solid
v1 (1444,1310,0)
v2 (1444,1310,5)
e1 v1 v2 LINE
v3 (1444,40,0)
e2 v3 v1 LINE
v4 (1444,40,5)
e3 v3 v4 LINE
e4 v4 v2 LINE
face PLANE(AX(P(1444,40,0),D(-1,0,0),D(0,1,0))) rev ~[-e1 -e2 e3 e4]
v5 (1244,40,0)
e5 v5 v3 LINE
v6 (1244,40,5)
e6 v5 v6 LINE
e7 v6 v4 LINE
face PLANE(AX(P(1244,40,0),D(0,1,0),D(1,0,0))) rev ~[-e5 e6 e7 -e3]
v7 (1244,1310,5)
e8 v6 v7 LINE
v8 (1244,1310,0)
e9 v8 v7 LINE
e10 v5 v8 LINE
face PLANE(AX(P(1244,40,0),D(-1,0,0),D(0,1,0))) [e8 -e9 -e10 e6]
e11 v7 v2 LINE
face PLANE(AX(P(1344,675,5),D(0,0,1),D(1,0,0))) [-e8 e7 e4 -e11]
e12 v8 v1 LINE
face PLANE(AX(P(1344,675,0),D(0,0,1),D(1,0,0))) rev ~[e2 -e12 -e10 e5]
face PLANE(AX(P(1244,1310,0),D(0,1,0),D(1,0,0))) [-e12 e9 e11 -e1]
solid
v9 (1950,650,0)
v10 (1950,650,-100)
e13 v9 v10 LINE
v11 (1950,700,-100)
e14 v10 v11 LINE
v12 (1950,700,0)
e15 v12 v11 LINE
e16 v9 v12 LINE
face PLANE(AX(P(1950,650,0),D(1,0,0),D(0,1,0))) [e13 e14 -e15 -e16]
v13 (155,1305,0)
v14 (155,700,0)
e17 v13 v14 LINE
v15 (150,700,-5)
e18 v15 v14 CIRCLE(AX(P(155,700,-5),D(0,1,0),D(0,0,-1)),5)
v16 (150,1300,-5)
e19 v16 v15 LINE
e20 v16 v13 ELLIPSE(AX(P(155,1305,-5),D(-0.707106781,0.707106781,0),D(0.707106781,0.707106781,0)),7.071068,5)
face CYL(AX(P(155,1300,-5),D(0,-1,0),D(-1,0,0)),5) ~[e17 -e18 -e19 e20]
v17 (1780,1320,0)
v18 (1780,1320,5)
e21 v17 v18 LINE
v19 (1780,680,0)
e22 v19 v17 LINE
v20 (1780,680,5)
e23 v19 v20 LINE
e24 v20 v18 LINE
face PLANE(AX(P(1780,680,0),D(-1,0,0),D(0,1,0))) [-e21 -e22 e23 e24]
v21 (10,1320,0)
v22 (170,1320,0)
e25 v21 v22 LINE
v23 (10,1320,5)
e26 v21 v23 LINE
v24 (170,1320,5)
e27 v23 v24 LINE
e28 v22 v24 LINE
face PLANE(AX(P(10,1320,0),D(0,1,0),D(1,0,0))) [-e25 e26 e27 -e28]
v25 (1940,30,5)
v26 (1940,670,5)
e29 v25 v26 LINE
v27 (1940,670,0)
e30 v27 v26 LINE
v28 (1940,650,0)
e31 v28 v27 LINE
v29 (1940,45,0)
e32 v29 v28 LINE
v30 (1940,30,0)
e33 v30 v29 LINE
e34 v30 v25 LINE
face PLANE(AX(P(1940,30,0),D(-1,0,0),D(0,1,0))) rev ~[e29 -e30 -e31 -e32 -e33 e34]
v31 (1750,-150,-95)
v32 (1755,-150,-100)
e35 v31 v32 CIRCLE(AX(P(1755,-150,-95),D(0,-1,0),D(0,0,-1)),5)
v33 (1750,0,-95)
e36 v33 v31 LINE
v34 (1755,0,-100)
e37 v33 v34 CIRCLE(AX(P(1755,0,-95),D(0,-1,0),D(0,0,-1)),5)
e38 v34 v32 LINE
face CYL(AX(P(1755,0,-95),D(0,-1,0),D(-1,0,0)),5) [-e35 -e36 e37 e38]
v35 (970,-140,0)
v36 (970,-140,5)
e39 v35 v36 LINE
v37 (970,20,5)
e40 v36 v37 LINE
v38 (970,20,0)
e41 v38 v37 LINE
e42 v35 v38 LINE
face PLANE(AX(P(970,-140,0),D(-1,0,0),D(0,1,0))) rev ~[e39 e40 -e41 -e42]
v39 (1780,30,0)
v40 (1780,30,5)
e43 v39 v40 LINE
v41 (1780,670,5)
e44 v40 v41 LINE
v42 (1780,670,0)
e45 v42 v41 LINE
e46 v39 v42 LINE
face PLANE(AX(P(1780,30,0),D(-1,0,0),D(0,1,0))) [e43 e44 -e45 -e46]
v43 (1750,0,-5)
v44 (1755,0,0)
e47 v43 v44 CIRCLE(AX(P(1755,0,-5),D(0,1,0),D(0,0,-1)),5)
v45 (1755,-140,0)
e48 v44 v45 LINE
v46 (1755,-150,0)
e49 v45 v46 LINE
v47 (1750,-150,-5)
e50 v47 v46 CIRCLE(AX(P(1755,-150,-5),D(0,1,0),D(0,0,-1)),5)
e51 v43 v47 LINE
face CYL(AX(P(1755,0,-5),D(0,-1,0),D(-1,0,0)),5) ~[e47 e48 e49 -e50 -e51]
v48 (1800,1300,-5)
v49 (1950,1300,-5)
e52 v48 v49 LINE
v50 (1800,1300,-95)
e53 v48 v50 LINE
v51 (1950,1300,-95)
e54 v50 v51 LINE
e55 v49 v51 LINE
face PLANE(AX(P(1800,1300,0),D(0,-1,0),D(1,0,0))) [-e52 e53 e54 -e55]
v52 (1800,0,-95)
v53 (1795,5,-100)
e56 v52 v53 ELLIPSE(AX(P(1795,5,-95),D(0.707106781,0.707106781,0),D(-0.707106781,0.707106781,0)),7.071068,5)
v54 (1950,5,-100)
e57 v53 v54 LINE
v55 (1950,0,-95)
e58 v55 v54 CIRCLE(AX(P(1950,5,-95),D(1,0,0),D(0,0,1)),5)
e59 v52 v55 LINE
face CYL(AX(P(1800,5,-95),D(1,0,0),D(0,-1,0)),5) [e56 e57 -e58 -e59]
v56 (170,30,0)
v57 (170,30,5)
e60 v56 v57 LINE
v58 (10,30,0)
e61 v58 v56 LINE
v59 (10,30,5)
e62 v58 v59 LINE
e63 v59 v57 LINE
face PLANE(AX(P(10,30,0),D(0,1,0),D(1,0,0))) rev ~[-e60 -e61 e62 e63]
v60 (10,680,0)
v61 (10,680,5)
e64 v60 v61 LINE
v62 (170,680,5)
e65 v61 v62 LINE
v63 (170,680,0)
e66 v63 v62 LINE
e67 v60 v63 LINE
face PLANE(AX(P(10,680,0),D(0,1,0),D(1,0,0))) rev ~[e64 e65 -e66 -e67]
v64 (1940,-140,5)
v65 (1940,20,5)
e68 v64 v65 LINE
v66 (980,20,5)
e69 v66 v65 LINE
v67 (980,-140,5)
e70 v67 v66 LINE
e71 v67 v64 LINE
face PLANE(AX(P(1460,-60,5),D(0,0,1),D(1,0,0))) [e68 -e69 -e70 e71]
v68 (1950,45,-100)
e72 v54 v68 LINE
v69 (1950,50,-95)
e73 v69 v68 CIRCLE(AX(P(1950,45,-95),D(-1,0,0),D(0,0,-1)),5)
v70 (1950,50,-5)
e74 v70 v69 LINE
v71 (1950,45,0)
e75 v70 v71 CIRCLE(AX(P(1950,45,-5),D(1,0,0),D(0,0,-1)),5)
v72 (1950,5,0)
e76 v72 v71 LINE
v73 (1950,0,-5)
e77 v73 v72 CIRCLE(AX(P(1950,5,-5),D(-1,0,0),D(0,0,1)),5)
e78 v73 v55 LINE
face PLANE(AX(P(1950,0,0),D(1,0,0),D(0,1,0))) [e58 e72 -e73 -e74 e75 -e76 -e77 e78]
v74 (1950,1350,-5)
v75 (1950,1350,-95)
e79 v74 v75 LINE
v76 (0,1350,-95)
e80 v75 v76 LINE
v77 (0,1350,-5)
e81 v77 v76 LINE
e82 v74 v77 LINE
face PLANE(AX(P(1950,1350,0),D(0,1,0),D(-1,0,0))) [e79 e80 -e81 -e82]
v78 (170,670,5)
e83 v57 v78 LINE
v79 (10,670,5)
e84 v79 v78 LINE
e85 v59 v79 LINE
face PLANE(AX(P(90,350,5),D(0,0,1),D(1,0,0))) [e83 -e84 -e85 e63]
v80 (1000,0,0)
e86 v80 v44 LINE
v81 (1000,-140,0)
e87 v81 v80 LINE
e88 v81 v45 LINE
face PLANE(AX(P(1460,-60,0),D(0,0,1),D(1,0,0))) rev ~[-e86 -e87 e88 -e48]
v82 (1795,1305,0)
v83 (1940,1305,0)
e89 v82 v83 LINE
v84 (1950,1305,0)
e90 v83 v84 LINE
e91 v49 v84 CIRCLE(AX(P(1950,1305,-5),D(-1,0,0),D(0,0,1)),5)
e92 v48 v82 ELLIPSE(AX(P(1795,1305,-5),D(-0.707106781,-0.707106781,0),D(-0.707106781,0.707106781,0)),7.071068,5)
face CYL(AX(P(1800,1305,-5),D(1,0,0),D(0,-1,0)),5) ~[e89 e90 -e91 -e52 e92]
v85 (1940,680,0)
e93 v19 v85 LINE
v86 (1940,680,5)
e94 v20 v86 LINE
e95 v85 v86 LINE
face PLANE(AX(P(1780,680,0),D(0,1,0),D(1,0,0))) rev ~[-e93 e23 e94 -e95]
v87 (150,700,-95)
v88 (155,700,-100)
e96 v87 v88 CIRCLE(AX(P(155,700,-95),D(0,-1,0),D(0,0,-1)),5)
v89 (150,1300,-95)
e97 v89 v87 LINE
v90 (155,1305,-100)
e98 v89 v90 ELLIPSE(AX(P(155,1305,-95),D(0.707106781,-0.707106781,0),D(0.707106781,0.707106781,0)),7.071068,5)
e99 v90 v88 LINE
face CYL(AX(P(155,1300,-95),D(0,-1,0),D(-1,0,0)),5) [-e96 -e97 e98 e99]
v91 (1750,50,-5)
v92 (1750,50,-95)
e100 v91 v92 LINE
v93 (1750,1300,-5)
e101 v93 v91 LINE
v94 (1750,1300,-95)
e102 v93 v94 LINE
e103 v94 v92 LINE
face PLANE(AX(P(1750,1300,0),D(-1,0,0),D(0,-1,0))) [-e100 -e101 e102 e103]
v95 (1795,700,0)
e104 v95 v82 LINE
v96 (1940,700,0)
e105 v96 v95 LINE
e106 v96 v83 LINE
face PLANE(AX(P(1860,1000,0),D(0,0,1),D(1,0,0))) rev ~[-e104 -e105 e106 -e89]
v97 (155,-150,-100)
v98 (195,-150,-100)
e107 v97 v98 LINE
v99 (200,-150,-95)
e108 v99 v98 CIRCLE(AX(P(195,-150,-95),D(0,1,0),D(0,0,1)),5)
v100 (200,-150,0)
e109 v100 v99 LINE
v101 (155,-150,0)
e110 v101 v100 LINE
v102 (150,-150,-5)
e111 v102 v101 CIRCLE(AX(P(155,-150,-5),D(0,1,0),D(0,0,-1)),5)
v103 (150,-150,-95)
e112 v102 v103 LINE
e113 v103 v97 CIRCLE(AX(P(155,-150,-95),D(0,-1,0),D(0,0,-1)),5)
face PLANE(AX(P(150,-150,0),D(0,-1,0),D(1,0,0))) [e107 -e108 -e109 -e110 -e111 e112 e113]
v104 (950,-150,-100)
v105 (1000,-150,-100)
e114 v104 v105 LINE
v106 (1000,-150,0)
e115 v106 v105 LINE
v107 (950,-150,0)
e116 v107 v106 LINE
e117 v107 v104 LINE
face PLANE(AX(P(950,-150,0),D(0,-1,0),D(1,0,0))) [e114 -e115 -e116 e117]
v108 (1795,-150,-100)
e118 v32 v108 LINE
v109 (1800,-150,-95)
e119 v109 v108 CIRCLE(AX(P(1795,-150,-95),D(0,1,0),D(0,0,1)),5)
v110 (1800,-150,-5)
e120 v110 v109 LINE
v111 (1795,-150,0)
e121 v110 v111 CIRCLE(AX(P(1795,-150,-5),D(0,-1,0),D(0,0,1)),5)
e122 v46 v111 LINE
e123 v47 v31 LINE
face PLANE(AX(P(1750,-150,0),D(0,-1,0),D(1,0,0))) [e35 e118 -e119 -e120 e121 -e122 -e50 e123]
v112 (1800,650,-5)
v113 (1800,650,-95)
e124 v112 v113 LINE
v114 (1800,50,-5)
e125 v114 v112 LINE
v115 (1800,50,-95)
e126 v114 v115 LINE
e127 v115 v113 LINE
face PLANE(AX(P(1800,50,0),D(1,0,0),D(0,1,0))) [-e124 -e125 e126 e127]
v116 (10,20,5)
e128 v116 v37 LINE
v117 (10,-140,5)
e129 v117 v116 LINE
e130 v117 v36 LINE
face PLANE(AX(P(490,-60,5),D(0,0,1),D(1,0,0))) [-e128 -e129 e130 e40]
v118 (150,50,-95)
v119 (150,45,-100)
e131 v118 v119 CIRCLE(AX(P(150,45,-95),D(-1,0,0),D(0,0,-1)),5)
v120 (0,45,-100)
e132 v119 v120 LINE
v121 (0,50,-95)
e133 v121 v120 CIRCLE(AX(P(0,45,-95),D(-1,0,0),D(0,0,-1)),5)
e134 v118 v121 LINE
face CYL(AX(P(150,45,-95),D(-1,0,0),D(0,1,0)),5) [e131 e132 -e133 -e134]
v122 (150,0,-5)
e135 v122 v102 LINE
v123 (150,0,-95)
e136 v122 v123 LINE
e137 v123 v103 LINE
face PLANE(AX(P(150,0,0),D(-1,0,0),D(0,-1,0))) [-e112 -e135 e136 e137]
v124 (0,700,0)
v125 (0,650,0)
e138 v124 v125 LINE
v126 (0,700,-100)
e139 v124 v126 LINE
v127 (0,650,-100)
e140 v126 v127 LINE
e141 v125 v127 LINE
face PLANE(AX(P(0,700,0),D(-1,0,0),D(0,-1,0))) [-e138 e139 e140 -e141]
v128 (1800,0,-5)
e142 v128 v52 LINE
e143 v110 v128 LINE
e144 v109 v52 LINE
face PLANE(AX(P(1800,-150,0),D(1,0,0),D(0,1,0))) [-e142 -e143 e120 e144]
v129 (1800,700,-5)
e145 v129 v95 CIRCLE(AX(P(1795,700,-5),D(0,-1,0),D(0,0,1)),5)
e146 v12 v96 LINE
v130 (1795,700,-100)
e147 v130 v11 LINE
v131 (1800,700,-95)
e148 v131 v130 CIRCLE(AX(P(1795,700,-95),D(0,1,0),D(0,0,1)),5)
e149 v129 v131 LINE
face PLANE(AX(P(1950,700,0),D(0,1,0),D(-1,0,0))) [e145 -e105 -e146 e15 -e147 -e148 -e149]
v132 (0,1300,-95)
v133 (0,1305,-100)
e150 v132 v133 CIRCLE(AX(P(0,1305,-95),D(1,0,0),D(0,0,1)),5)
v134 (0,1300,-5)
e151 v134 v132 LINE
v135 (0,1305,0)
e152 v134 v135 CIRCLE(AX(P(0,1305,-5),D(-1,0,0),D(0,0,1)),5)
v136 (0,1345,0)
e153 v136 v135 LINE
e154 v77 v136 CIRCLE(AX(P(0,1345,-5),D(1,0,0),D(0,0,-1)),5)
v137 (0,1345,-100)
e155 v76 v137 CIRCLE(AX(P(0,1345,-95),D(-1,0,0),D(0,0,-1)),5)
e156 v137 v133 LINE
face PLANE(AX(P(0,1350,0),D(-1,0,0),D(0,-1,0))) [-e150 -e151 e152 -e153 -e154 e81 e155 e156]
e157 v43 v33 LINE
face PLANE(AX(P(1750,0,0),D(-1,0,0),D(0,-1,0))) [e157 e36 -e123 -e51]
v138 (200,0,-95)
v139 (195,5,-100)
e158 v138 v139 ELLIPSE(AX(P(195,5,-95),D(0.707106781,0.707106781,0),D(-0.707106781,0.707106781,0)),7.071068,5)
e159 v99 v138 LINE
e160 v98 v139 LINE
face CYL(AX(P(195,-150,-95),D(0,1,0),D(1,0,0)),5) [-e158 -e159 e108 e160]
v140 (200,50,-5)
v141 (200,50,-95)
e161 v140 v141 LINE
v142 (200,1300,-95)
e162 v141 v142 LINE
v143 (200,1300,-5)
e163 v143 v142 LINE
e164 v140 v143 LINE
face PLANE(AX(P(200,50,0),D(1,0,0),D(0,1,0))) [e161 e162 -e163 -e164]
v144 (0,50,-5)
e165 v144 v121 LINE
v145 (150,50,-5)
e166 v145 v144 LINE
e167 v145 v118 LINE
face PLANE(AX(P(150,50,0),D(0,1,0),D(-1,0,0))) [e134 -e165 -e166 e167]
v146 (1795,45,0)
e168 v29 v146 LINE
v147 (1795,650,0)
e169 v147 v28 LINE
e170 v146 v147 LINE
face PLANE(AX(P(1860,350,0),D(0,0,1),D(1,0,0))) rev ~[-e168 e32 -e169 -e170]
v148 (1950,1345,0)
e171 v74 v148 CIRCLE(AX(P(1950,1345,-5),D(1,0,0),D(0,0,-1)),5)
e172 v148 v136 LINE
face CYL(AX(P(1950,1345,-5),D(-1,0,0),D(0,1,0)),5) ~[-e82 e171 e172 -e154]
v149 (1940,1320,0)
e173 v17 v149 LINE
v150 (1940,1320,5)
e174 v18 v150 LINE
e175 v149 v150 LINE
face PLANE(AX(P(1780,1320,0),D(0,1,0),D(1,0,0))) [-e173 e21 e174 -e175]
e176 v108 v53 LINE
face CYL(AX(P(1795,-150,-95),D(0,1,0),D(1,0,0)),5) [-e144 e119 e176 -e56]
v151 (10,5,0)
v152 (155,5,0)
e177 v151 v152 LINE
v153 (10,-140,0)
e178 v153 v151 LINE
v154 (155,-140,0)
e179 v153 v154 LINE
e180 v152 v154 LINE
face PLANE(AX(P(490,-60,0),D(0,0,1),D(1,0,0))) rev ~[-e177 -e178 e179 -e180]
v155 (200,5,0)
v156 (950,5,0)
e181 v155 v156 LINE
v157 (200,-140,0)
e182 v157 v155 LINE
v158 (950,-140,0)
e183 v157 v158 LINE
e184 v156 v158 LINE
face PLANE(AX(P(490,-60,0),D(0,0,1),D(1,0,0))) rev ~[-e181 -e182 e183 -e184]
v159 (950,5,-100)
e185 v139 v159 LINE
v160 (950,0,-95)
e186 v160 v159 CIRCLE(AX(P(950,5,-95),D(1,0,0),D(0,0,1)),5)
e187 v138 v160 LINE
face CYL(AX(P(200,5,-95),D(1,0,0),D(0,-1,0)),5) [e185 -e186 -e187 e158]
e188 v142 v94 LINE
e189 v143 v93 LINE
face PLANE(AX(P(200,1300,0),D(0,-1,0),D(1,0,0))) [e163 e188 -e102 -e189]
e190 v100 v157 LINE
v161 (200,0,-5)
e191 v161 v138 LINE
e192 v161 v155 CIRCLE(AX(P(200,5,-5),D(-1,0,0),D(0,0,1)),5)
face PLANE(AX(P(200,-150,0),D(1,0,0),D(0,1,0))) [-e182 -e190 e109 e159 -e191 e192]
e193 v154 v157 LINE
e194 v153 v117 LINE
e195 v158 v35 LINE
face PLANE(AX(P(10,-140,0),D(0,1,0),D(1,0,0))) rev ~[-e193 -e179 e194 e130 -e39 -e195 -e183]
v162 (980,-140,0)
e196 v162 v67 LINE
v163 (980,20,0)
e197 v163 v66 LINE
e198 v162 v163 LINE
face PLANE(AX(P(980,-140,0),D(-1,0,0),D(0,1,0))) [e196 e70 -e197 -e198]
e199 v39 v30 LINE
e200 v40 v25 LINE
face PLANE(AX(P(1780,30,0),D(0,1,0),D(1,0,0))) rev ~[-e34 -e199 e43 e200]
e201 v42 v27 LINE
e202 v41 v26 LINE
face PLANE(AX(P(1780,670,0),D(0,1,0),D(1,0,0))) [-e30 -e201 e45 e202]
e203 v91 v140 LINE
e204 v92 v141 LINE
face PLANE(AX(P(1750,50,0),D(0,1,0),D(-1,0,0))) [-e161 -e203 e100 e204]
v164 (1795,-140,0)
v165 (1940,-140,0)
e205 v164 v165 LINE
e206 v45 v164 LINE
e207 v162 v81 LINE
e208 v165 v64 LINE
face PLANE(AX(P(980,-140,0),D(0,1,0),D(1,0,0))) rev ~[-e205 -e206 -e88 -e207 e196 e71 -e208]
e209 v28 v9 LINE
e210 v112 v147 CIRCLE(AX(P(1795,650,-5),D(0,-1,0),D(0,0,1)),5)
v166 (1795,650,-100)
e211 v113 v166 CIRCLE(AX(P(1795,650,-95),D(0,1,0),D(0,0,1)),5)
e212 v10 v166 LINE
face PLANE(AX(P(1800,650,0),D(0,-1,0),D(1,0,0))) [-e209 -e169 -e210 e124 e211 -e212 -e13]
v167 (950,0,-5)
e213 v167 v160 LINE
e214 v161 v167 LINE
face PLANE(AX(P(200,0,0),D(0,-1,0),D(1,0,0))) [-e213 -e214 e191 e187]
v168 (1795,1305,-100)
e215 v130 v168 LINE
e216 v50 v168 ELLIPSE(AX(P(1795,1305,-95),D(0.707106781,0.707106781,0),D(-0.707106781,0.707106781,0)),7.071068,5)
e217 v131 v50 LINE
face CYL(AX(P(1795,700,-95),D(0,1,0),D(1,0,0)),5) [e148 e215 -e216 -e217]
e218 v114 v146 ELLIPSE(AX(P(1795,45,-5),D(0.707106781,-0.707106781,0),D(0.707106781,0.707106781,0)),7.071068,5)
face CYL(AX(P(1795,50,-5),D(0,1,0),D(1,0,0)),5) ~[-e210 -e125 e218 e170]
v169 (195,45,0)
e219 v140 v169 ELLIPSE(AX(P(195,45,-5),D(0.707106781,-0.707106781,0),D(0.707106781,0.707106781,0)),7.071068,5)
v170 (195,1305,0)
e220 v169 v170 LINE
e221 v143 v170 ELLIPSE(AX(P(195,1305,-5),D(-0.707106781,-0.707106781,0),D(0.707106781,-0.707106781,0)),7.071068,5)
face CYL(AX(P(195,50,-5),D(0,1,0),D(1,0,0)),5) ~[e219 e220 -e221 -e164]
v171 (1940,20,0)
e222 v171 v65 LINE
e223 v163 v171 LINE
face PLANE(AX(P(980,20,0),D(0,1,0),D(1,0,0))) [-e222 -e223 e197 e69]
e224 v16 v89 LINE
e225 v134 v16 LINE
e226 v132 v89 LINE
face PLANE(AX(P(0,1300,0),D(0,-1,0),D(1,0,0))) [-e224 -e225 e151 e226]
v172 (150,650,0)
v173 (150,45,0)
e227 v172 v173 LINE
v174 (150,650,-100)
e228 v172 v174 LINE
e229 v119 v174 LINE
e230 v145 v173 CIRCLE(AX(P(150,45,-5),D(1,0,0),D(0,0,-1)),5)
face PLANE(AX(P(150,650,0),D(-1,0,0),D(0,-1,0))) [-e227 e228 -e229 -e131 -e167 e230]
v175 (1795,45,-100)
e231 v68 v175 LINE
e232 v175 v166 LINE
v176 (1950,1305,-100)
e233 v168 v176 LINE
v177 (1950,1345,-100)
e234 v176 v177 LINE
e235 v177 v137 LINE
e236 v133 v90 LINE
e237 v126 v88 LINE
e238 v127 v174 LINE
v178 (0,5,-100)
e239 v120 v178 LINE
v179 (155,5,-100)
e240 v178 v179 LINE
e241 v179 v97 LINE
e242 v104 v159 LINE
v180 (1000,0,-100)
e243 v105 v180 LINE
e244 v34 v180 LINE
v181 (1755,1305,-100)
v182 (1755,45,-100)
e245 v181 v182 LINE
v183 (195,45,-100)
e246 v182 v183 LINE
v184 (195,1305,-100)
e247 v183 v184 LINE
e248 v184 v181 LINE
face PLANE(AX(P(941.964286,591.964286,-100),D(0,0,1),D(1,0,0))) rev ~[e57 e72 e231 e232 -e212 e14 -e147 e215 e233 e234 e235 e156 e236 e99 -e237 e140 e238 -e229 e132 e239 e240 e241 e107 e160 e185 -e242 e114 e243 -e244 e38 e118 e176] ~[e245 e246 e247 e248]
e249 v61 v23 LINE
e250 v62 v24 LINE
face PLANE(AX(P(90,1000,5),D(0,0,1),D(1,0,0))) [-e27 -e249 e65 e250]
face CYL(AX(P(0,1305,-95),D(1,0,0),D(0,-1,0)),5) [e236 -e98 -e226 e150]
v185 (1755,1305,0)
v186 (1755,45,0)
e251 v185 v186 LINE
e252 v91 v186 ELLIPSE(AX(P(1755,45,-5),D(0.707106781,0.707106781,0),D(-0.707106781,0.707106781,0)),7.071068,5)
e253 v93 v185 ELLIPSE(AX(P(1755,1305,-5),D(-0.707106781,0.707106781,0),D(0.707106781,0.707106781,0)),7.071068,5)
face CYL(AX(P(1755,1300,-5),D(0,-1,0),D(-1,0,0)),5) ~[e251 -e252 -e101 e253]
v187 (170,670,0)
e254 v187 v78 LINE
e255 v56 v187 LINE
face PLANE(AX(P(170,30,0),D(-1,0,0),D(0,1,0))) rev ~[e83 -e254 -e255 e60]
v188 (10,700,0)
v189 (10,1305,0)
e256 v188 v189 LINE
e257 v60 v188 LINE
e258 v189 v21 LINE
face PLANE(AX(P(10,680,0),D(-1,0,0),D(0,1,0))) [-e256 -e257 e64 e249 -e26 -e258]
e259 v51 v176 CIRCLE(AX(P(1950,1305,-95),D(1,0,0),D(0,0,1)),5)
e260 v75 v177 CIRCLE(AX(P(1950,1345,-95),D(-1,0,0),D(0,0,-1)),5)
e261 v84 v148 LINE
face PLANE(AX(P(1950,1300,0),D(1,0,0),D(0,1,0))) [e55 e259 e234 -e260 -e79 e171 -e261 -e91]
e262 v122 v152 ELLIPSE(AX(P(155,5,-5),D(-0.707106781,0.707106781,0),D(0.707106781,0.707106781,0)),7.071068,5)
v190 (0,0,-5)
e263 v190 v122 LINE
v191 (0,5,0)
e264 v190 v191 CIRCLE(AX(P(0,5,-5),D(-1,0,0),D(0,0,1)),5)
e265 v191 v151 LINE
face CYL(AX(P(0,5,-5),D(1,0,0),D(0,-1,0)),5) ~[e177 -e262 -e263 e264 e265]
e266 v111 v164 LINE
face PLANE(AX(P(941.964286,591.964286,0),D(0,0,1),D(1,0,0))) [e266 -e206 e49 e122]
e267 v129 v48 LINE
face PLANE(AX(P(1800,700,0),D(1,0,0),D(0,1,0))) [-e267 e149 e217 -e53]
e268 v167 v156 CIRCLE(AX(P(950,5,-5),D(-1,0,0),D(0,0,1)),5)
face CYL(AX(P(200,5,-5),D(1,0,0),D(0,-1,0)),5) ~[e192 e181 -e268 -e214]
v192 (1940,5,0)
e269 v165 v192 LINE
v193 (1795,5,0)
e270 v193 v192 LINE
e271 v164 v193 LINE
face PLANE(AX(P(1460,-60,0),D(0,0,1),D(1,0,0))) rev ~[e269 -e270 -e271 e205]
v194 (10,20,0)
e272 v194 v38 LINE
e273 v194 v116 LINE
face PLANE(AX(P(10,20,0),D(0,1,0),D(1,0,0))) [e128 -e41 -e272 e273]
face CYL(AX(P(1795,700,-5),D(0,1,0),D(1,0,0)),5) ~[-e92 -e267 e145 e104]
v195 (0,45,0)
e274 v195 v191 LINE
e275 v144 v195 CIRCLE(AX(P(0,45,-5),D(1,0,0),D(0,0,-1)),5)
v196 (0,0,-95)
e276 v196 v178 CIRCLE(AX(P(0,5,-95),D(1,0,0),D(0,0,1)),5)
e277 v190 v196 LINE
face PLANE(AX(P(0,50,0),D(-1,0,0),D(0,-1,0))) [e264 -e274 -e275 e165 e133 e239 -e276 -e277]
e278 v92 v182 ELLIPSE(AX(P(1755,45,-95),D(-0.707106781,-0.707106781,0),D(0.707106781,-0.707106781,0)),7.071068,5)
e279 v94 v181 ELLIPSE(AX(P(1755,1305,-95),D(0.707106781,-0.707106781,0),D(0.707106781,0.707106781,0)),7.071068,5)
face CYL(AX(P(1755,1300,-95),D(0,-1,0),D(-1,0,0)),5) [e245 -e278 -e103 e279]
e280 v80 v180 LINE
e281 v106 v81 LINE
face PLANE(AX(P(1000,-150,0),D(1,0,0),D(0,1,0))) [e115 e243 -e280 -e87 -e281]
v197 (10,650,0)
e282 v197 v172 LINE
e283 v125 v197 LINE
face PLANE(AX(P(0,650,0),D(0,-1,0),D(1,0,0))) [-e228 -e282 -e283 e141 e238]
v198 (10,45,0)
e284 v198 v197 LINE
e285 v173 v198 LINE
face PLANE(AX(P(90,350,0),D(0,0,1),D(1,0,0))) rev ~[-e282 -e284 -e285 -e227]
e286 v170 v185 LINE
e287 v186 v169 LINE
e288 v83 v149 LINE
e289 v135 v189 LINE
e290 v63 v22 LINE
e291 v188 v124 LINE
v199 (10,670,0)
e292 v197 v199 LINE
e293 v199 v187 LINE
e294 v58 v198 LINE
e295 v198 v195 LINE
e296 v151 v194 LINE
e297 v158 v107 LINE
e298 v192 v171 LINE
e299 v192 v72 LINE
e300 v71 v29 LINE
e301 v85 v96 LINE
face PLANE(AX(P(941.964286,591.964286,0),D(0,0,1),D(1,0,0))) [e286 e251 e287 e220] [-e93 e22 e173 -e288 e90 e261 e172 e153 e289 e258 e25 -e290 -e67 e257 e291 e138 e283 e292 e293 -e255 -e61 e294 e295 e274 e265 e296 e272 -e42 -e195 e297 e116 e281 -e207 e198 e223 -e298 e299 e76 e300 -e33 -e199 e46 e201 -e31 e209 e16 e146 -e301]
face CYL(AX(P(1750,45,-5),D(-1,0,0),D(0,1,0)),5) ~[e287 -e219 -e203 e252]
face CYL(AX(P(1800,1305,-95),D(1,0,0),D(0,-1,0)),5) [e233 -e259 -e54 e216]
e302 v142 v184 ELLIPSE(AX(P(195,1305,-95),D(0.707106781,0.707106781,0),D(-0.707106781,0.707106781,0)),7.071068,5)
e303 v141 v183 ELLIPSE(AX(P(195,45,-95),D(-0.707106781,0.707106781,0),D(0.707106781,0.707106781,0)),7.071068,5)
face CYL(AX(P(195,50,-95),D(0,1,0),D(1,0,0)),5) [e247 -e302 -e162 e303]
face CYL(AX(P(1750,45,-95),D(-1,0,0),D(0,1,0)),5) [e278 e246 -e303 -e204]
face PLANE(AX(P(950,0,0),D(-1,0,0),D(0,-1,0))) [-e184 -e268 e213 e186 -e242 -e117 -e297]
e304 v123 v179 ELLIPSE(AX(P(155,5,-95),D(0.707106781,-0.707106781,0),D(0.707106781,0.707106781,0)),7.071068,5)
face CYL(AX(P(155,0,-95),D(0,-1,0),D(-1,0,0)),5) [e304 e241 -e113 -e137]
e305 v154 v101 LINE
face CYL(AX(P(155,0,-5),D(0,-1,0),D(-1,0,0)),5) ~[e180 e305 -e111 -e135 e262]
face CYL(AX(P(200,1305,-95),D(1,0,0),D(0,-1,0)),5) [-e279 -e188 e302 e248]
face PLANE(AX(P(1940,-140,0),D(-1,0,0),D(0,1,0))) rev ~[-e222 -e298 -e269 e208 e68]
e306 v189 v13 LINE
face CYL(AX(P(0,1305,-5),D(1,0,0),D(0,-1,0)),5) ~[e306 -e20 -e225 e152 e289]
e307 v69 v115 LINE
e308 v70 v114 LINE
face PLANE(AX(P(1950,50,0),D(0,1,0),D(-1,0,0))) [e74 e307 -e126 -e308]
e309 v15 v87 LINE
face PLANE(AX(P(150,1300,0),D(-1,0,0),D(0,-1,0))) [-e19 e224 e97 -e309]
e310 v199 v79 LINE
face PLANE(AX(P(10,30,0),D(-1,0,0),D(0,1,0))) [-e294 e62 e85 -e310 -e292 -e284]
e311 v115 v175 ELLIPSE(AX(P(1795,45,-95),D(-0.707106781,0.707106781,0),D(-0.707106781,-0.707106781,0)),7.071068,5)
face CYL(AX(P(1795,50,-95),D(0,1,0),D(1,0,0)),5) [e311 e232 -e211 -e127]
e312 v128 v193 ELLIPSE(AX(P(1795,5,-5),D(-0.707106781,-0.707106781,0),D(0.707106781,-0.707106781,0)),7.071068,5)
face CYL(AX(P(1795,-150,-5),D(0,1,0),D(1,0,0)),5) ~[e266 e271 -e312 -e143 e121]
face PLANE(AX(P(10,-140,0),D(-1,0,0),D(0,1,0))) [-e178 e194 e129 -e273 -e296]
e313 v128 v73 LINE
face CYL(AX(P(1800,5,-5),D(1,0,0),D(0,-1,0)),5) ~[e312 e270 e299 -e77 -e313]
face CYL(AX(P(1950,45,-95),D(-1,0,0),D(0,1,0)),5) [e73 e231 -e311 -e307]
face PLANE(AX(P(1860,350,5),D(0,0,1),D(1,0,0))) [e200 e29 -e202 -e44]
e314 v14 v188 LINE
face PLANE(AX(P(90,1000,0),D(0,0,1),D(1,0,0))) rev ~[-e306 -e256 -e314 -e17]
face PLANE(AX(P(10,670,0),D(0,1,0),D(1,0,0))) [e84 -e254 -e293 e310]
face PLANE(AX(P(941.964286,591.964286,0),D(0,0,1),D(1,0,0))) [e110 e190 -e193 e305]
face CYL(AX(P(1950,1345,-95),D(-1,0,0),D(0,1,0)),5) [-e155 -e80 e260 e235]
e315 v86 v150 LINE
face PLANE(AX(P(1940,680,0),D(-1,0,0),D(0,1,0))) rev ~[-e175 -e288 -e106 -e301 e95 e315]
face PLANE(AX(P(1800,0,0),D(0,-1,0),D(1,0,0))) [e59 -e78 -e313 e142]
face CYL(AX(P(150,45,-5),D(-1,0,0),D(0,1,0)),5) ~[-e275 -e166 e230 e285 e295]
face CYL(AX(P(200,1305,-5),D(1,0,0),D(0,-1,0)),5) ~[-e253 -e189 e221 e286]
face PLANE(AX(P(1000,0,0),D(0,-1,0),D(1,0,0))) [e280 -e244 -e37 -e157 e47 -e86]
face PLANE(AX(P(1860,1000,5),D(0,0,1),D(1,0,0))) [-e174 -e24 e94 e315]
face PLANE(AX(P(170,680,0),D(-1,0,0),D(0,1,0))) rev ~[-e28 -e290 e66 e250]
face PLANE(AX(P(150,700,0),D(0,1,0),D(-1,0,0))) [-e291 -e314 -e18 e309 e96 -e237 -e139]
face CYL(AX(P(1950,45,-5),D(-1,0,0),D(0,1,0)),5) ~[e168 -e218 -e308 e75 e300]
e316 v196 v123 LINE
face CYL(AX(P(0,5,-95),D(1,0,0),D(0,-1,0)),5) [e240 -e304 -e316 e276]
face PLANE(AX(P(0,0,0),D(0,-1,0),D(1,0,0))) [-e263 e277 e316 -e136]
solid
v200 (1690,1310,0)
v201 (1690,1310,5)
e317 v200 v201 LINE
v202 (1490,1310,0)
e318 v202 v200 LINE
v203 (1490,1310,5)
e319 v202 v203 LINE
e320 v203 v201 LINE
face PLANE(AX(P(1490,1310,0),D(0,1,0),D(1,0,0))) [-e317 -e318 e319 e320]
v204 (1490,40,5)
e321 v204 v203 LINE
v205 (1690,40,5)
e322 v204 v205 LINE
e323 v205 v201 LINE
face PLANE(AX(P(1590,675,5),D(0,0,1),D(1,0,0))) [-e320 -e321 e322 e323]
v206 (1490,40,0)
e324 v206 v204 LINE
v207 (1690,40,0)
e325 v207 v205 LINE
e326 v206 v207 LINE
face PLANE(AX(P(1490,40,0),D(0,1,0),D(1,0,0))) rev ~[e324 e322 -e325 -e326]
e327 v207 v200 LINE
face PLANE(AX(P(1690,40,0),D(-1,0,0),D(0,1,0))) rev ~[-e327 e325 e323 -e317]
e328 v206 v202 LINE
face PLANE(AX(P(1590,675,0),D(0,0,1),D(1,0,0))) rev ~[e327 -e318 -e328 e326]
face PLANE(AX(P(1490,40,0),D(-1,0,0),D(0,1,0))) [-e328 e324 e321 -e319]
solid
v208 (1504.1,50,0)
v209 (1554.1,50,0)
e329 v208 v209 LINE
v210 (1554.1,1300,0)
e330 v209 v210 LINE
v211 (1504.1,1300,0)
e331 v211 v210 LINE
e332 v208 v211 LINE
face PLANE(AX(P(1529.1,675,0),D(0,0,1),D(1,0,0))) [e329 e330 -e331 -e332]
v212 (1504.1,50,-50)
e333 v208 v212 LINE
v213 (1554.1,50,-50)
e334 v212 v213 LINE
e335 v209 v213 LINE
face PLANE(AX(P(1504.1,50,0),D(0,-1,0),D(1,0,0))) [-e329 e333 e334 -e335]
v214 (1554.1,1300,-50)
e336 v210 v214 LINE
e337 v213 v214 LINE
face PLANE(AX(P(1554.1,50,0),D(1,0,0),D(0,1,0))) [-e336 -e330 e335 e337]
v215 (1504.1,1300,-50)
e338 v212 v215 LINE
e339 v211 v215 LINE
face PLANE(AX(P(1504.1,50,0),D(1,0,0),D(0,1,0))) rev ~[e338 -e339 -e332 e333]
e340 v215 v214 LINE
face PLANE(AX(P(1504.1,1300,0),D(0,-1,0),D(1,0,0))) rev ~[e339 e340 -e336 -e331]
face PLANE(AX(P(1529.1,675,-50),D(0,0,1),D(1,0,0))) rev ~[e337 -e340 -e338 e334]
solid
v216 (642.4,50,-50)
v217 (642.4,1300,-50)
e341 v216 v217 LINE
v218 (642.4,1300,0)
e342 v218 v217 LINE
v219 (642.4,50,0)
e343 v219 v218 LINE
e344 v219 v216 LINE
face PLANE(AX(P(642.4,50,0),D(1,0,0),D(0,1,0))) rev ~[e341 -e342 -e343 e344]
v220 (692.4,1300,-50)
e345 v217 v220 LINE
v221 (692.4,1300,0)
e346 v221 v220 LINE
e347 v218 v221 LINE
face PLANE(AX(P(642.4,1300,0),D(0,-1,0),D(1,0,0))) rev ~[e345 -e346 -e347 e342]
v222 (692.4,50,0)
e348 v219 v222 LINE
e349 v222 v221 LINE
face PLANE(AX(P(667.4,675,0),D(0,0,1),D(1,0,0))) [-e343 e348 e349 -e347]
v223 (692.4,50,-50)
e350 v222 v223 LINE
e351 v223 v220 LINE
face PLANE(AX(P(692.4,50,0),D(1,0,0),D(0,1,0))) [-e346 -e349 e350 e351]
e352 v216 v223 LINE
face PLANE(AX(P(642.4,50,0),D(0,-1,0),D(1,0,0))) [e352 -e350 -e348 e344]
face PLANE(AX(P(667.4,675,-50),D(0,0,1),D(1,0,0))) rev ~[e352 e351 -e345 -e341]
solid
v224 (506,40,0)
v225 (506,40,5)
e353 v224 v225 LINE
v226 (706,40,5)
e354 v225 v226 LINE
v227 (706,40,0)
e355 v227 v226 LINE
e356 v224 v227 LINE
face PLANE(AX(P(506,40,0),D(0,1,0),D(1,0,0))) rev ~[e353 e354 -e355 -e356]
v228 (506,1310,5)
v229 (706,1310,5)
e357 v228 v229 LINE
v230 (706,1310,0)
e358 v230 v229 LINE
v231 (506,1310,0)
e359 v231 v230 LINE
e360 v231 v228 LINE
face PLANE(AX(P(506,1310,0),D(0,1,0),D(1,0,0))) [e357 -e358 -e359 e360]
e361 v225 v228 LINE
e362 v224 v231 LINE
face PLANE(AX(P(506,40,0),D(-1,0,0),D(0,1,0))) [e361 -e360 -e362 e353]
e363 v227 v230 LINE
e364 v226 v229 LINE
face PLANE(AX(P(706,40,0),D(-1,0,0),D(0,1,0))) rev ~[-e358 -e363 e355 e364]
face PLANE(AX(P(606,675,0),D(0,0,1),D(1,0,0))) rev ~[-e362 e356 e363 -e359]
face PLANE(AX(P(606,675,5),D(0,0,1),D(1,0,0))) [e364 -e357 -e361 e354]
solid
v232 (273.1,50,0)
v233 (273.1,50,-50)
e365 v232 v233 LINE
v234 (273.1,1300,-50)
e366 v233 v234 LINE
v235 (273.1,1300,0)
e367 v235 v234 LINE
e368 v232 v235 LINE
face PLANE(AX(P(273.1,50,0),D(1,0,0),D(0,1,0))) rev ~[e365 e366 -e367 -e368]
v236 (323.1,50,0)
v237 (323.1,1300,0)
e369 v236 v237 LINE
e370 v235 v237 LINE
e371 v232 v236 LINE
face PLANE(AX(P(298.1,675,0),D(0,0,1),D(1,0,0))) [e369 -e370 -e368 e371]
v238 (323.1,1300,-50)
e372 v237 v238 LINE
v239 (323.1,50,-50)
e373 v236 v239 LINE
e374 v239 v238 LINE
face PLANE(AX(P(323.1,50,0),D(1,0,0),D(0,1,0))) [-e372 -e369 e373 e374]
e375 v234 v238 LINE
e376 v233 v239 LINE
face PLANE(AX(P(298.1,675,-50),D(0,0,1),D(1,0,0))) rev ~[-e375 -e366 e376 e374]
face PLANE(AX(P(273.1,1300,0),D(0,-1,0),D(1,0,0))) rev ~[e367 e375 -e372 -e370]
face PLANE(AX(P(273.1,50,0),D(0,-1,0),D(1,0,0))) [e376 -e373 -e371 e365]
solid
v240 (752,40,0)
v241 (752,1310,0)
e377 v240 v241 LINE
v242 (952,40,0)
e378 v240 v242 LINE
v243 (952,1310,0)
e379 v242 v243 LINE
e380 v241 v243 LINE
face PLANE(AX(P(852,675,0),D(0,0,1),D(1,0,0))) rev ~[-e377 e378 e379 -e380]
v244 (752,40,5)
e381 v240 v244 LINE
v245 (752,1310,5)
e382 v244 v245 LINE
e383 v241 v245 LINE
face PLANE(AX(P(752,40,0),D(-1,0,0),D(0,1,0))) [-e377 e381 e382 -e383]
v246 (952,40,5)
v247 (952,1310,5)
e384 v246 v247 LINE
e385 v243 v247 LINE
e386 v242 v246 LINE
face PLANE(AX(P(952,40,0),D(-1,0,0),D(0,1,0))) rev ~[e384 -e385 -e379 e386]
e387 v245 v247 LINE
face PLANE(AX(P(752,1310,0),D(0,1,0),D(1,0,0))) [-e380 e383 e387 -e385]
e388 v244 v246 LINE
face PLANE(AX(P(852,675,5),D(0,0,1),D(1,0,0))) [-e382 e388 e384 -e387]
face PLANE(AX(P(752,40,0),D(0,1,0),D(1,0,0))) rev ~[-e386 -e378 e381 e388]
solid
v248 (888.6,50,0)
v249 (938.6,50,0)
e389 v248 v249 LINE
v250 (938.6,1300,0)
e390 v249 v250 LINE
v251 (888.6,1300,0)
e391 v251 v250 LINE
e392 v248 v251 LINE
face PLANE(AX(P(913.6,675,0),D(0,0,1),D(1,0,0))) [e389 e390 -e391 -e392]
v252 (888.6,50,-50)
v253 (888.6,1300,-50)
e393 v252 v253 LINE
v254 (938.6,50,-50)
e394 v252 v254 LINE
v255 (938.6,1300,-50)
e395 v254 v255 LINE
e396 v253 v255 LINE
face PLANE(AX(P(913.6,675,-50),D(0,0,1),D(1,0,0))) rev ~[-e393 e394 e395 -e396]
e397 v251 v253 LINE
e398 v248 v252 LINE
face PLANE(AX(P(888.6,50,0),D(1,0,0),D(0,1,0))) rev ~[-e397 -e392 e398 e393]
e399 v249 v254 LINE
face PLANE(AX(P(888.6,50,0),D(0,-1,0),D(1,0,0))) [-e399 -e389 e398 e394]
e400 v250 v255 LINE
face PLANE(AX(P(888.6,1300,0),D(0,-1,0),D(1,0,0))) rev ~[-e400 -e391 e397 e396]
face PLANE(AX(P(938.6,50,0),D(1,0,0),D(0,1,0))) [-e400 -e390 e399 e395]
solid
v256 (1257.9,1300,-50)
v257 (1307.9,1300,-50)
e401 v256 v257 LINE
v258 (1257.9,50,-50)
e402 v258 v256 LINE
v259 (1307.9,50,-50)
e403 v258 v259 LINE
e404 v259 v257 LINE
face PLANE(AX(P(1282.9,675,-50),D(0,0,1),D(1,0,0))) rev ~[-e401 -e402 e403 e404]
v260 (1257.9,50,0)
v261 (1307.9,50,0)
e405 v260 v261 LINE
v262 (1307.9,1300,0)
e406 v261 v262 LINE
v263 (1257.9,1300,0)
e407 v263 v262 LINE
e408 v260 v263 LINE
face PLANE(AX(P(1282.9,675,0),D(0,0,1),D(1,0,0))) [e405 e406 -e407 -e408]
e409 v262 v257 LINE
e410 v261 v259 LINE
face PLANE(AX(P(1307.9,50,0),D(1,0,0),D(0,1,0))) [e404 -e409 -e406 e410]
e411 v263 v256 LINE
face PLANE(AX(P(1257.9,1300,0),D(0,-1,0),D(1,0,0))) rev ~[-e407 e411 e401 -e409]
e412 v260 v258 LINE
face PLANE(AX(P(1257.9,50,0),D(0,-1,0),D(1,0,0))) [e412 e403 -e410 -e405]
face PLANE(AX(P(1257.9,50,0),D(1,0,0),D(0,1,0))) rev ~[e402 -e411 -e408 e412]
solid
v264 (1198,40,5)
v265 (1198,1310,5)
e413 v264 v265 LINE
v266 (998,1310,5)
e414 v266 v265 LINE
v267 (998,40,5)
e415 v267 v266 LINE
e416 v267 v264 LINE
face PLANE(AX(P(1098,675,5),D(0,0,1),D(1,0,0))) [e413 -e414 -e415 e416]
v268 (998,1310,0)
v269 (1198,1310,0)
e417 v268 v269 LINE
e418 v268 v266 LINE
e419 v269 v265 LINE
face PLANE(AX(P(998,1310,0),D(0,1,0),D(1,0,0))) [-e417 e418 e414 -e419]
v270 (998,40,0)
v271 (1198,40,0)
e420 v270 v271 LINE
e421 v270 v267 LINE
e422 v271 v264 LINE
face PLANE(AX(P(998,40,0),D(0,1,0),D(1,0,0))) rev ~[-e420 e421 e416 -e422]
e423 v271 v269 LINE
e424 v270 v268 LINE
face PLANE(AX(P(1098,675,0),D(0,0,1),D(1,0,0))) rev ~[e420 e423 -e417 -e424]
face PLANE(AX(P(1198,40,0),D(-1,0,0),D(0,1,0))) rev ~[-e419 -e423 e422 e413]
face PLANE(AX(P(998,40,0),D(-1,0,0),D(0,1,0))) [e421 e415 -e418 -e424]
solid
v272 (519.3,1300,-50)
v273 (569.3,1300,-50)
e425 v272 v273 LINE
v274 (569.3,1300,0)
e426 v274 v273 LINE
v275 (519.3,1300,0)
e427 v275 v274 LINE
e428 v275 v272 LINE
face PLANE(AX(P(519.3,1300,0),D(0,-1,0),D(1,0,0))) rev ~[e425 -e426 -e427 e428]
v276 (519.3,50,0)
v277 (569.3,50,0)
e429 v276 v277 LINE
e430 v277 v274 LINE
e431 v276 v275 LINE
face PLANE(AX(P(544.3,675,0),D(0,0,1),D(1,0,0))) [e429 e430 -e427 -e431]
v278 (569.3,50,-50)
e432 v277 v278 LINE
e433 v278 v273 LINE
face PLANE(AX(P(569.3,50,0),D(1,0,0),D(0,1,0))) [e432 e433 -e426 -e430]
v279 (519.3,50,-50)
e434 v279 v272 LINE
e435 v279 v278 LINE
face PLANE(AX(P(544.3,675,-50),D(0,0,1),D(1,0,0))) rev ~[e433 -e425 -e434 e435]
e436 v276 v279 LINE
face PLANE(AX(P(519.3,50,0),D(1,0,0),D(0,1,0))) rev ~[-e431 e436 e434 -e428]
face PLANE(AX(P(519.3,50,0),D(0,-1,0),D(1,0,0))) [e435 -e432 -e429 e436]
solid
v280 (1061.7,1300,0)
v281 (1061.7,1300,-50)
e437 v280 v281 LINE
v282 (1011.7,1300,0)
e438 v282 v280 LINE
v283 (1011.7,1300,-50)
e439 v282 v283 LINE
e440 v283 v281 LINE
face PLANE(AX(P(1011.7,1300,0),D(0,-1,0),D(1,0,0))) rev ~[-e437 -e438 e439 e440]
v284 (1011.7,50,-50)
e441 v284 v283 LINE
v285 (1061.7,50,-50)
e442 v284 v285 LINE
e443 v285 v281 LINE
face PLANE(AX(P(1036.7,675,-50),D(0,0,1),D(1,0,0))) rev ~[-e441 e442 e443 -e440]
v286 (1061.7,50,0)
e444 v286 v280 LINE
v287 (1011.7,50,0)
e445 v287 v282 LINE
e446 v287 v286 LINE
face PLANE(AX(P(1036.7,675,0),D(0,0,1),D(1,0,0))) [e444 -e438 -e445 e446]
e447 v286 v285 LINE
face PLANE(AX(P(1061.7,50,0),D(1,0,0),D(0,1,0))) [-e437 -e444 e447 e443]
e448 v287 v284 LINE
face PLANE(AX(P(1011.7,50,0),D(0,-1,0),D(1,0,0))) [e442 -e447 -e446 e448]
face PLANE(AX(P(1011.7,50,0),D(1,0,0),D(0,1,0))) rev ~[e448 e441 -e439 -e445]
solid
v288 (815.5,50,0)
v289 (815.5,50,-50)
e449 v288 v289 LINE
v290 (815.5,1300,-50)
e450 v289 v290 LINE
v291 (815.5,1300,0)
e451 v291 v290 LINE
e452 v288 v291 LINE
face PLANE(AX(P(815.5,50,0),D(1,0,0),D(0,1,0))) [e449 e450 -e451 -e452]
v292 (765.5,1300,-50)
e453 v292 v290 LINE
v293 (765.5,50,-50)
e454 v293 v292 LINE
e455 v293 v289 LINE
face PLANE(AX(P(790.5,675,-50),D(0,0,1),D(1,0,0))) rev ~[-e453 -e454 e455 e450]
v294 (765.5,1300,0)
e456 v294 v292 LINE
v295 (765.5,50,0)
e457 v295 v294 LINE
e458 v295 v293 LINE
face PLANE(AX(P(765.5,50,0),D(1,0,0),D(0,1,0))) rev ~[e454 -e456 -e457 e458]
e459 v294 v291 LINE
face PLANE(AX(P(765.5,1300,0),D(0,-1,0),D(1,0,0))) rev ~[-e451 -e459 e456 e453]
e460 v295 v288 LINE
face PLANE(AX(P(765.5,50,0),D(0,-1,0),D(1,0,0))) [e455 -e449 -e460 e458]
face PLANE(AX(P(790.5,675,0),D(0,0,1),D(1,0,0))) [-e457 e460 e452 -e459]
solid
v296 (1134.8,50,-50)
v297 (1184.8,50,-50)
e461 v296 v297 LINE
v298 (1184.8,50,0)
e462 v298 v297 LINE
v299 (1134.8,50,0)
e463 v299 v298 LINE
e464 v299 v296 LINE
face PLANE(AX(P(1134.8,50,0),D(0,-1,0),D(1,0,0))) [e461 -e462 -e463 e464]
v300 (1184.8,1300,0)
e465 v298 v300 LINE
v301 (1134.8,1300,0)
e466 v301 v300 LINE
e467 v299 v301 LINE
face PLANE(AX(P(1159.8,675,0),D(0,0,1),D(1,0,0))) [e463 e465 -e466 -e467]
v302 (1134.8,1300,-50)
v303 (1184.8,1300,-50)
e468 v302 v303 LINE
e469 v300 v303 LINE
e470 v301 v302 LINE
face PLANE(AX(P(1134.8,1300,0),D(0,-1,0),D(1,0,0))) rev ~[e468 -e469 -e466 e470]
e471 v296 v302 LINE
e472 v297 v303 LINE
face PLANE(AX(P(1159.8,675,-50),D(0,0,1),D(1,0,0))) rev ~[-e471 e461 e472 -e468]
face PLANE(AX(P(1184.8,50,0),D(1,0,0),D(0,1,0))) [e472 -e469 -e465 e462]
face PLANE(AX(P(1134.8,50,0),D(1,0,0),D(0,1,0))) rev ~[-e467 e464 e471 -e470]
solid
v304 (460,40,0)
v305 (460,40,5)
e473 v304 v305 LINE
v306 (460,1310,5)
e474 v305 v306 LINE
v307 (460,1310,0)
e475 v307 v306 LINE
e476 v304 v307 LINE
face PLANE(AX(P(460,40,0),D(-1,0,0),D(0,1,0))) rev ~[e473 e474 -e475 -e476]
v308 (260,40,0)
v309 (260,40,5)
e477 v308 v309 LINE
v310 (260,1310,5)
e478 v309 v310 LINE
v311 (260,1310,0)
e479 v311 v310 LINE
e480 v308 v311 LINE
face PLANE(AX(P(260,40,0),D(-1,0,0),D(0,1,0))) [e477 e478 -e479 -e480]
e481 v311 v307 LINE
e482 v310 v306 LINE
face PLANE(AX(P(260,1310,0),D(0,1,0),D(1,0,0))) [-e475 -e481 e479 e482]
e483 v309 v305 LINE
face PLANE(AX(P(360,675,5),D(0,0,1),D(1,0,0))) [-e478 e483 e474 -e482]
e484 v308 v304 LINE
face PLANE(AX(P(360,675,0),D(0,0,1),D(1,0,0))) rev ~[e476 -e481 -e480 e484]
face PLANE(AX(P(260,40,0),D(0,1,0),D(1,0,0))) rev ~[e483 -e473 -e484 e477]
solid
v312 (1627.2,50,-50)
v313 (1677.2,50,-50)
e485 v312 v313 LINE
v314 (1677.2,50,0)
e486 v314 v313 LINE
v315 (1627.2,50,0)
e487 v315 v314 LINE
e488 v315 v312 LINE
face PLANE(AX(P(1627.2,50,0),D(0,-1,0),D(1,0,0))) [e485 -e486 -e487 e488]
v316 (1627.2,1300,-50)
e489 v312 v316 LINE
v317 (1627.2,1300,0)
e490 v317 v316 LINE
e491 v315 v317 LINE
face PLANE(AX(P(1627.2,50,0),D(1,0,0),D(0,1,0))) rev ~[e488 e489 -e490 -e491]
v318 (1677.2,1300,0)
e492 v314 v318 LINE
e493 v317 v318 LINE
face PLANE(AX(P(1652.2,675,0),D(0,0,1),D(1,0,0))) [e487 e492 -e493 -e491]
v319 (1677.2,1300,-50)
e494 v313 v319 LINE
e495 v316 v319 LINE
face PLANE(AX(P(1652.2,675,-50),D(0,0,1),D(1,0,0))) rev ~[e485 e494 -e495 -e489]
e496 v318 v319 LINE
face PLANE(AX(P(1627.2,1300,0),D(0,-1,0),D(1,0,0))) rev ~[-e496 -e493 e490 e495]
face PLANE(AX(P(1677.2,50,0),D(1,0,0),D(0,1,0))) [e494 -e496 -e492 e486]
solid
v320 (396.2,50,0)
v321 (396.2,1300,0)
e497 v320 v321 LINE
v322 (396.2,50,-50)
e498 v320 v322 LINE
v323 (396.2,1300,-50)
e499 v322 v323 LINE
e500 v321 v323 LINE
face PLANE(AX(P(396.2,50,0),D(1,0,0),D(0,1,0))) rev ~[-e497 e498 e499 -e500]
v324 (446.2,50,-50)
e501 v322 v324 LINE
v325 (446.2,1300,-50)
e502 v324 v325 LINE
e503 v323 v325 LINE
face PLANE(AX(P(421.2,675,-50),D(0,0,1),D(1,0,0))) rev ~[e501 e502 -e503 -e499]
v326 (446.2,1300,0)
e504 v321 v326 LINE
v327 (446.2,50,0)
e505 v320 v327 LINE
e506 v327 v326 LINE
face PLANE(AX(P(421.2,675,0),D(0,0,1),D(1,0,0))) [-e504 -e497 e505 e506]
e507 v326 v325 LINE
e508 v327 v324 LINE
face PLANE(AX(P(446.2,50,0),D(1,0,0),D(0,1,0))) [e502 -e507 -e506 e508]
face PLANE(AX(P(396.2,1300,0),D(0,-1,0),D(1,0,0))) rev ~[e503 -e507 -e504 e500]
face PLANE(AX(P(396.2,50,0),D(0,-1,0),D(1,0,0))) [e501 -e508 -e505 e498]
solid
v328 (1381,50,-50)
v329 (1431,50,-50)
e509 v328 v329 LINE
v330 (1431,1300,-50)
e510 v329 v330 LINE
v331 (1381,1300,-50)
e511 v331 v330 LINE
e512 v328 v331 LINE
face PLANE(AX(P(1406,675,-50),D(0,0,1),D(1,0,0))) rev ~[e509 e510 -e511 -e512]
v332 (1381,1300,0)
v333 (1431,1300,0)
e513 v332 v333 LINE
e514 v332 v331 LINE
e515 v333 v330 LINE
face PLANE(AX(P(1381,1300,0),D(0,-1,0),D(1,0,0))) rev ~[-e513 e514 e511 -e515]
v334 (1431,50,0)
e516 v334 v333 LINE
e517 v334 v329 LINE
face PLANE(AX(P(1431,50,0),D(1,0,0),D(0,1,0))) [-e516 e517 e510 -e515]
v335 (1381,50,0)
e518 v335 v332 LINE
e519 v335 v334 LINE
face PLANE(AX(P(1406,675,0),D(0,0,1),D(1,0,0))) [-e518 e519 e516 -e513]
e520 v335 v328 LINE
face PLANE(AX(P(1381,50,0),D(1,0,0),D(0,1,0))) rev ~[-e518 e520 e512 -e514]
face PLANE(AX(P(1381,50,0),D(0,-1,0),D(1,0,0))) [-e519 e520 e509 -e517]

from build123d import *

# Parameters (mm, degrees)
F1_DEPTH = 100
F2_R     = 5
F0_W     = 50
F0_H     = 1250
F3_DEPTH = 50
F5_W     = 960
F5_H     = 160
F5_W_2   = 160
F5_H_2   = 640
F6_DEPTH = 5
F7_W     = 200
F7_H     = 1270
F8_DEPTH = 5


# Not quite as in the source:
# - two fillets or chamfers of one size are made in one step


with BuildPart() as f1:
    # F0 (on Top) → F1 (new body)
    with BuildSketch(Plane.XY):
        Polygon((0, 50), (0, 0), (150, 0), (150, -150), (200, -150), (200, 0), (950, 0), (950, -150), (1000, -150), (1000, 0), (1750, 0), (1750, -150), (1800, -150), (1800, 0), (1950, 0), (1950, 50), (1800, 50), (1800, 650), (1800, 700), (1800, 1300), (1950, 1300), (1950, 1350), (0, 1350), (0, 1300), (150, 1300), (150, 700), (0, 700), (0, 675), (0, 650), (150, 650), (150, 50), align=None)
        Polygon((200, 50), (200, 1300), (273.1, 1300), (323.1, 1300), (396.2, 1300), (446.2, 1300), (519.3, 1300), (569.3, 1300), (642.4, 1300), (692.4, 1300), (765.5, 1300), (815.5, 1300), (888.6, 1300), (938.6, 1300), (1011.7, 1300), (1061.7, 1300), (1134.8, 1300), (1184.8, 1300), (1257.9, 1300), (1307.9, 1300), (1381, 1300), (1431, 1300), (1504.1, 1300), (1554.1, 1300), (1627.2, 1300), (1677.2, 1300), (1750, 1300), (1750, 50), (1677.2, 50), (1627.2, 50), (1554.1, 50), (1504.1, 50), (1431, 50), (1381, 50), (1307.9, 50), (1257.9, 50), (1184.8, 50), (1134.8, 50), (1061.7, 50), (1011.7, 50), (938.6, 50), (888.6, 50), (815.5, 50), (765.5, 50), (692.4, 50), (642.4, 50), (569.3, 50), (519.3, 50), (446.2, 50), (396.2, 50), (323.1, 50), (273.1, 50), align=None, mode=Mode.SUBTRACT)
        Polygon((1950, 700), (1800, 700), (1800, 650), (1950, 650), (1950, 675), align=None)
    extrude(amount=-F1_DEPTH)

    # F2
    f2_edges = [f1.edges().sort_by_distance(p)[0] for p in [
        (75, 1300, 0),
        (975, 1350, 0),
        (975, 1300, 0),
        (200, 675, 0),
        (150, 1000, 0),
        (575, 0, 0),
        (975, 50, 0),
        (75, 50, 0),
        (75, 0, 0),
        (150, -75, 0),
        (1750, 675, 0),
        (1800, 350, 0),
        (1800, 1000, 0),
        (1875, 50, 0),
        (1875, 0, 0),
        (1800, -75, 0),
        (1750, -75, 0),
        (1875, 1300, 0),
        (75, 0, -100),
        (150, -75, -100),
        (200, -75, -100),
        (575, 0, -100),
        (1750, -75, -100),
        (1800, -75, -100),
        (1875, 0, -100),
        (1875, 50, -100),
        (1800, 350, -100),
        (1800, 1000, -100),
        (1875, 1300, -100),
        (975, 1350, -100),
        (75, 1300, -100),
        (150, 1000, -100),
        (75, 50, -100),
        (200, 675, -100),
        (975, 1300, -100),
        (1750, 675, -100),
        (975, 50, -100),
    ]]
    fillet(f2_edges, radius=F2_R)

    # F5 (on Top) → F6 (join)
    with BuildSketch(Plane.XY):
        with Locations((1460, -60)):
            Rectangle(F5_W, F5_H)
        with Locations((490, -60)):
            Rectangle(F5_W, F5_H)
        with Locations((90, 1000)):
            Rectangle(F5_W_2, F5_H_2)
        with Locations((90, 350)):
            Rectangle(F5_W_2, F5_H_2)
        with Locations((1860, 350)):
            Rectangle(F5_W_2, F5_H_2)
        with Locations((1860, 1000)):
            Rectangle(F5_W_2, F5_H_2)
    extrude(amount=F6_DEPTH)


with BuildPart() as f3:
    # F0 (on Top) → F3 (new body)
    with BuildSketch(Plane.XY):
        with Locations((298.1, 675)):
            Rectangle(F0_W, F0_H)
    extrude(amount=-F3_DEPTH)


with BuildPart() as f3b:
    # F0 (on Top) → F3, piece 2 (new body)
    with BuildSketch(Plane.XY):
        with Locations((421.2, 675)):
            Rectangle(F0_W, F0_H)
    extrude(amount=-F3_DEPTH)


with BuildPart() as f3c:
    # F0 (on Top) → F3, piece 3 (new body)
    with BuildSketch(Plane.XY):
        with Locations((544.3, 675)):
            Rectangle(F0_W, F0_H)
    extrude(amount=-F3_DEPTH)


with BuildPart() as f3d:
    # F0 (on Top) → F3, piece 4 (new body)
    with BuildSketch(Plane.XY):
        with Locations((667.4, 675)):
            Rectangle(F0_W, F0_H)
    extrude(amount=-F3_DEPTH)


with BuildPart() as f3e:
    # F0 (on Top) → F3, piece 5 (new body)
    with BuildSketch(Plane.XY):
        with Locations((790.5, 675)):
            Rectangle(F0_W, F0_H)
    extrude(amount=-F3_DEPTH)


with BuildPart() as f3f:
    # F0 (on Top) → F3, piece 6 (new body)
    with BuildSketch(Plane.XY):
        with Locations((913.6, 675)):
            Rectangle(F0_W, F0_H)
    extrude(amount=-F3_DEPTH)


with BuildPart() as f3g:
    # F0 (on Top) → F3, piece 7 (new body)
    with BuildSketch(Plane.XY):
        with Locations((1036.7, 675)):
            Rectangle(F0_W, F0_H)
    extrude(amount=-F3_DEPTH)


with BuildPart() as f3h:
    # F0 (on Top) → F3, piece 8 (new body)
    with BuildSketch(Plane.XY):
        with Locations((1159.8, 675)):
            Rectangle(F0_W, F0_H)
    extrude(amount=-F3_DEPTH)


with BuildPart() as f3i:
    # F0 (on Top) → F3, piece 9 (new body)
    with BuildSketch(Plane.XY):
        with Locations((1282.9, 675)):
            Rectangle(F0_W, F0_H)
    extrude(amount=-F3_DEPTH)


with BuildPart() as f3j:
    # F0 (on Top) → F3, piece 10 (new body)
    with BuildSketch(Plane.XY):
        with Locations((1406, 675)):
            Rectangle(F0_W, F0_H)
    extrude(amount=-F3_DEPTH)


with BuildPart() as f3k:
    # F0 (on Top) → F3, piece 11 (new body)
    with BuildSketch(Plane.XY):
        with Locations((1529.1, 675)):
            Rectangle(F0_W, F0_H)
    extrude(amount=-F3_DEPTH)


with BuildPart() as f3l:
    # F0 (on Top) → F3, piece 12 (new body)
    with BuildSketch(Plane.XY):
        with Locations((1652.2, 675)):
            Rectangle(F0_W, F0_H)
    extrude(amount=-F3_DEPTH)


with BuildPart() as f8:
    # F7 (on Top) → F8 (new body)
    with BuildSketch(Plane.XY):
        with Locations((360, 675)):
            Rectangle(F7_W, F7_H)
    extrude(amount=F8_DEPTH)


with BuildPart() as f8b:
    # F7 (on Top) → F8, piece 2 (new body)
    with BuildSketch(Plane.XY):
        with Locations((606, 675)):
            Rectangle(F7_W, F7_H)
    extrude(amount=F8_DEPTH)


with BuildPart() as f8c:
    # F7 (on Top) → F8, piece 3 (new body)
    with BuildSketch(Plane.XY):
        with Locations((852, 675)):
            Rectangle(F7_W, F7_H)
    extrude(amount=F8_DEPTH)


with BuildPart() as f8d:
    # F7 (on Top) → F8, piece 4 (new body)
    with BuildSketch(Plane.XY):
        with Locations((1098, 675)):
            Rectangle(F7_W, F7_H)
    extrude(amount=F8_DEPTH)


with BuildPart() as f8e:
    # F7 (on Top) → F8, piece 5 (new body)
    with BuildSketch(Plane.XY):
        with Locations((1344, 675)):
            Rectangle(F7_W, F7_H)
    extrude(amount=F8_DEPTH)


with BuildPart() as f8f:
    # F7 (on Top) → F8, piece 6 (new body)
    with BuildSketch(Plane.XY):
        with Locations((1590, 675)):
            Rectangle(F7_W, F7_H)
    extrude(amount=F8_DEPTH)


solid = Compound([f1.part, f3.part, f3b.part, f3c.part, f3d.part, f3e.part, f3f.part, f3g.part, f3h.part, f3i.part, f3j.part, f3k.part, f3l.part, f8.part, f8b.part, f8c.part, f8d.part, f8e.part, f8f.part])
